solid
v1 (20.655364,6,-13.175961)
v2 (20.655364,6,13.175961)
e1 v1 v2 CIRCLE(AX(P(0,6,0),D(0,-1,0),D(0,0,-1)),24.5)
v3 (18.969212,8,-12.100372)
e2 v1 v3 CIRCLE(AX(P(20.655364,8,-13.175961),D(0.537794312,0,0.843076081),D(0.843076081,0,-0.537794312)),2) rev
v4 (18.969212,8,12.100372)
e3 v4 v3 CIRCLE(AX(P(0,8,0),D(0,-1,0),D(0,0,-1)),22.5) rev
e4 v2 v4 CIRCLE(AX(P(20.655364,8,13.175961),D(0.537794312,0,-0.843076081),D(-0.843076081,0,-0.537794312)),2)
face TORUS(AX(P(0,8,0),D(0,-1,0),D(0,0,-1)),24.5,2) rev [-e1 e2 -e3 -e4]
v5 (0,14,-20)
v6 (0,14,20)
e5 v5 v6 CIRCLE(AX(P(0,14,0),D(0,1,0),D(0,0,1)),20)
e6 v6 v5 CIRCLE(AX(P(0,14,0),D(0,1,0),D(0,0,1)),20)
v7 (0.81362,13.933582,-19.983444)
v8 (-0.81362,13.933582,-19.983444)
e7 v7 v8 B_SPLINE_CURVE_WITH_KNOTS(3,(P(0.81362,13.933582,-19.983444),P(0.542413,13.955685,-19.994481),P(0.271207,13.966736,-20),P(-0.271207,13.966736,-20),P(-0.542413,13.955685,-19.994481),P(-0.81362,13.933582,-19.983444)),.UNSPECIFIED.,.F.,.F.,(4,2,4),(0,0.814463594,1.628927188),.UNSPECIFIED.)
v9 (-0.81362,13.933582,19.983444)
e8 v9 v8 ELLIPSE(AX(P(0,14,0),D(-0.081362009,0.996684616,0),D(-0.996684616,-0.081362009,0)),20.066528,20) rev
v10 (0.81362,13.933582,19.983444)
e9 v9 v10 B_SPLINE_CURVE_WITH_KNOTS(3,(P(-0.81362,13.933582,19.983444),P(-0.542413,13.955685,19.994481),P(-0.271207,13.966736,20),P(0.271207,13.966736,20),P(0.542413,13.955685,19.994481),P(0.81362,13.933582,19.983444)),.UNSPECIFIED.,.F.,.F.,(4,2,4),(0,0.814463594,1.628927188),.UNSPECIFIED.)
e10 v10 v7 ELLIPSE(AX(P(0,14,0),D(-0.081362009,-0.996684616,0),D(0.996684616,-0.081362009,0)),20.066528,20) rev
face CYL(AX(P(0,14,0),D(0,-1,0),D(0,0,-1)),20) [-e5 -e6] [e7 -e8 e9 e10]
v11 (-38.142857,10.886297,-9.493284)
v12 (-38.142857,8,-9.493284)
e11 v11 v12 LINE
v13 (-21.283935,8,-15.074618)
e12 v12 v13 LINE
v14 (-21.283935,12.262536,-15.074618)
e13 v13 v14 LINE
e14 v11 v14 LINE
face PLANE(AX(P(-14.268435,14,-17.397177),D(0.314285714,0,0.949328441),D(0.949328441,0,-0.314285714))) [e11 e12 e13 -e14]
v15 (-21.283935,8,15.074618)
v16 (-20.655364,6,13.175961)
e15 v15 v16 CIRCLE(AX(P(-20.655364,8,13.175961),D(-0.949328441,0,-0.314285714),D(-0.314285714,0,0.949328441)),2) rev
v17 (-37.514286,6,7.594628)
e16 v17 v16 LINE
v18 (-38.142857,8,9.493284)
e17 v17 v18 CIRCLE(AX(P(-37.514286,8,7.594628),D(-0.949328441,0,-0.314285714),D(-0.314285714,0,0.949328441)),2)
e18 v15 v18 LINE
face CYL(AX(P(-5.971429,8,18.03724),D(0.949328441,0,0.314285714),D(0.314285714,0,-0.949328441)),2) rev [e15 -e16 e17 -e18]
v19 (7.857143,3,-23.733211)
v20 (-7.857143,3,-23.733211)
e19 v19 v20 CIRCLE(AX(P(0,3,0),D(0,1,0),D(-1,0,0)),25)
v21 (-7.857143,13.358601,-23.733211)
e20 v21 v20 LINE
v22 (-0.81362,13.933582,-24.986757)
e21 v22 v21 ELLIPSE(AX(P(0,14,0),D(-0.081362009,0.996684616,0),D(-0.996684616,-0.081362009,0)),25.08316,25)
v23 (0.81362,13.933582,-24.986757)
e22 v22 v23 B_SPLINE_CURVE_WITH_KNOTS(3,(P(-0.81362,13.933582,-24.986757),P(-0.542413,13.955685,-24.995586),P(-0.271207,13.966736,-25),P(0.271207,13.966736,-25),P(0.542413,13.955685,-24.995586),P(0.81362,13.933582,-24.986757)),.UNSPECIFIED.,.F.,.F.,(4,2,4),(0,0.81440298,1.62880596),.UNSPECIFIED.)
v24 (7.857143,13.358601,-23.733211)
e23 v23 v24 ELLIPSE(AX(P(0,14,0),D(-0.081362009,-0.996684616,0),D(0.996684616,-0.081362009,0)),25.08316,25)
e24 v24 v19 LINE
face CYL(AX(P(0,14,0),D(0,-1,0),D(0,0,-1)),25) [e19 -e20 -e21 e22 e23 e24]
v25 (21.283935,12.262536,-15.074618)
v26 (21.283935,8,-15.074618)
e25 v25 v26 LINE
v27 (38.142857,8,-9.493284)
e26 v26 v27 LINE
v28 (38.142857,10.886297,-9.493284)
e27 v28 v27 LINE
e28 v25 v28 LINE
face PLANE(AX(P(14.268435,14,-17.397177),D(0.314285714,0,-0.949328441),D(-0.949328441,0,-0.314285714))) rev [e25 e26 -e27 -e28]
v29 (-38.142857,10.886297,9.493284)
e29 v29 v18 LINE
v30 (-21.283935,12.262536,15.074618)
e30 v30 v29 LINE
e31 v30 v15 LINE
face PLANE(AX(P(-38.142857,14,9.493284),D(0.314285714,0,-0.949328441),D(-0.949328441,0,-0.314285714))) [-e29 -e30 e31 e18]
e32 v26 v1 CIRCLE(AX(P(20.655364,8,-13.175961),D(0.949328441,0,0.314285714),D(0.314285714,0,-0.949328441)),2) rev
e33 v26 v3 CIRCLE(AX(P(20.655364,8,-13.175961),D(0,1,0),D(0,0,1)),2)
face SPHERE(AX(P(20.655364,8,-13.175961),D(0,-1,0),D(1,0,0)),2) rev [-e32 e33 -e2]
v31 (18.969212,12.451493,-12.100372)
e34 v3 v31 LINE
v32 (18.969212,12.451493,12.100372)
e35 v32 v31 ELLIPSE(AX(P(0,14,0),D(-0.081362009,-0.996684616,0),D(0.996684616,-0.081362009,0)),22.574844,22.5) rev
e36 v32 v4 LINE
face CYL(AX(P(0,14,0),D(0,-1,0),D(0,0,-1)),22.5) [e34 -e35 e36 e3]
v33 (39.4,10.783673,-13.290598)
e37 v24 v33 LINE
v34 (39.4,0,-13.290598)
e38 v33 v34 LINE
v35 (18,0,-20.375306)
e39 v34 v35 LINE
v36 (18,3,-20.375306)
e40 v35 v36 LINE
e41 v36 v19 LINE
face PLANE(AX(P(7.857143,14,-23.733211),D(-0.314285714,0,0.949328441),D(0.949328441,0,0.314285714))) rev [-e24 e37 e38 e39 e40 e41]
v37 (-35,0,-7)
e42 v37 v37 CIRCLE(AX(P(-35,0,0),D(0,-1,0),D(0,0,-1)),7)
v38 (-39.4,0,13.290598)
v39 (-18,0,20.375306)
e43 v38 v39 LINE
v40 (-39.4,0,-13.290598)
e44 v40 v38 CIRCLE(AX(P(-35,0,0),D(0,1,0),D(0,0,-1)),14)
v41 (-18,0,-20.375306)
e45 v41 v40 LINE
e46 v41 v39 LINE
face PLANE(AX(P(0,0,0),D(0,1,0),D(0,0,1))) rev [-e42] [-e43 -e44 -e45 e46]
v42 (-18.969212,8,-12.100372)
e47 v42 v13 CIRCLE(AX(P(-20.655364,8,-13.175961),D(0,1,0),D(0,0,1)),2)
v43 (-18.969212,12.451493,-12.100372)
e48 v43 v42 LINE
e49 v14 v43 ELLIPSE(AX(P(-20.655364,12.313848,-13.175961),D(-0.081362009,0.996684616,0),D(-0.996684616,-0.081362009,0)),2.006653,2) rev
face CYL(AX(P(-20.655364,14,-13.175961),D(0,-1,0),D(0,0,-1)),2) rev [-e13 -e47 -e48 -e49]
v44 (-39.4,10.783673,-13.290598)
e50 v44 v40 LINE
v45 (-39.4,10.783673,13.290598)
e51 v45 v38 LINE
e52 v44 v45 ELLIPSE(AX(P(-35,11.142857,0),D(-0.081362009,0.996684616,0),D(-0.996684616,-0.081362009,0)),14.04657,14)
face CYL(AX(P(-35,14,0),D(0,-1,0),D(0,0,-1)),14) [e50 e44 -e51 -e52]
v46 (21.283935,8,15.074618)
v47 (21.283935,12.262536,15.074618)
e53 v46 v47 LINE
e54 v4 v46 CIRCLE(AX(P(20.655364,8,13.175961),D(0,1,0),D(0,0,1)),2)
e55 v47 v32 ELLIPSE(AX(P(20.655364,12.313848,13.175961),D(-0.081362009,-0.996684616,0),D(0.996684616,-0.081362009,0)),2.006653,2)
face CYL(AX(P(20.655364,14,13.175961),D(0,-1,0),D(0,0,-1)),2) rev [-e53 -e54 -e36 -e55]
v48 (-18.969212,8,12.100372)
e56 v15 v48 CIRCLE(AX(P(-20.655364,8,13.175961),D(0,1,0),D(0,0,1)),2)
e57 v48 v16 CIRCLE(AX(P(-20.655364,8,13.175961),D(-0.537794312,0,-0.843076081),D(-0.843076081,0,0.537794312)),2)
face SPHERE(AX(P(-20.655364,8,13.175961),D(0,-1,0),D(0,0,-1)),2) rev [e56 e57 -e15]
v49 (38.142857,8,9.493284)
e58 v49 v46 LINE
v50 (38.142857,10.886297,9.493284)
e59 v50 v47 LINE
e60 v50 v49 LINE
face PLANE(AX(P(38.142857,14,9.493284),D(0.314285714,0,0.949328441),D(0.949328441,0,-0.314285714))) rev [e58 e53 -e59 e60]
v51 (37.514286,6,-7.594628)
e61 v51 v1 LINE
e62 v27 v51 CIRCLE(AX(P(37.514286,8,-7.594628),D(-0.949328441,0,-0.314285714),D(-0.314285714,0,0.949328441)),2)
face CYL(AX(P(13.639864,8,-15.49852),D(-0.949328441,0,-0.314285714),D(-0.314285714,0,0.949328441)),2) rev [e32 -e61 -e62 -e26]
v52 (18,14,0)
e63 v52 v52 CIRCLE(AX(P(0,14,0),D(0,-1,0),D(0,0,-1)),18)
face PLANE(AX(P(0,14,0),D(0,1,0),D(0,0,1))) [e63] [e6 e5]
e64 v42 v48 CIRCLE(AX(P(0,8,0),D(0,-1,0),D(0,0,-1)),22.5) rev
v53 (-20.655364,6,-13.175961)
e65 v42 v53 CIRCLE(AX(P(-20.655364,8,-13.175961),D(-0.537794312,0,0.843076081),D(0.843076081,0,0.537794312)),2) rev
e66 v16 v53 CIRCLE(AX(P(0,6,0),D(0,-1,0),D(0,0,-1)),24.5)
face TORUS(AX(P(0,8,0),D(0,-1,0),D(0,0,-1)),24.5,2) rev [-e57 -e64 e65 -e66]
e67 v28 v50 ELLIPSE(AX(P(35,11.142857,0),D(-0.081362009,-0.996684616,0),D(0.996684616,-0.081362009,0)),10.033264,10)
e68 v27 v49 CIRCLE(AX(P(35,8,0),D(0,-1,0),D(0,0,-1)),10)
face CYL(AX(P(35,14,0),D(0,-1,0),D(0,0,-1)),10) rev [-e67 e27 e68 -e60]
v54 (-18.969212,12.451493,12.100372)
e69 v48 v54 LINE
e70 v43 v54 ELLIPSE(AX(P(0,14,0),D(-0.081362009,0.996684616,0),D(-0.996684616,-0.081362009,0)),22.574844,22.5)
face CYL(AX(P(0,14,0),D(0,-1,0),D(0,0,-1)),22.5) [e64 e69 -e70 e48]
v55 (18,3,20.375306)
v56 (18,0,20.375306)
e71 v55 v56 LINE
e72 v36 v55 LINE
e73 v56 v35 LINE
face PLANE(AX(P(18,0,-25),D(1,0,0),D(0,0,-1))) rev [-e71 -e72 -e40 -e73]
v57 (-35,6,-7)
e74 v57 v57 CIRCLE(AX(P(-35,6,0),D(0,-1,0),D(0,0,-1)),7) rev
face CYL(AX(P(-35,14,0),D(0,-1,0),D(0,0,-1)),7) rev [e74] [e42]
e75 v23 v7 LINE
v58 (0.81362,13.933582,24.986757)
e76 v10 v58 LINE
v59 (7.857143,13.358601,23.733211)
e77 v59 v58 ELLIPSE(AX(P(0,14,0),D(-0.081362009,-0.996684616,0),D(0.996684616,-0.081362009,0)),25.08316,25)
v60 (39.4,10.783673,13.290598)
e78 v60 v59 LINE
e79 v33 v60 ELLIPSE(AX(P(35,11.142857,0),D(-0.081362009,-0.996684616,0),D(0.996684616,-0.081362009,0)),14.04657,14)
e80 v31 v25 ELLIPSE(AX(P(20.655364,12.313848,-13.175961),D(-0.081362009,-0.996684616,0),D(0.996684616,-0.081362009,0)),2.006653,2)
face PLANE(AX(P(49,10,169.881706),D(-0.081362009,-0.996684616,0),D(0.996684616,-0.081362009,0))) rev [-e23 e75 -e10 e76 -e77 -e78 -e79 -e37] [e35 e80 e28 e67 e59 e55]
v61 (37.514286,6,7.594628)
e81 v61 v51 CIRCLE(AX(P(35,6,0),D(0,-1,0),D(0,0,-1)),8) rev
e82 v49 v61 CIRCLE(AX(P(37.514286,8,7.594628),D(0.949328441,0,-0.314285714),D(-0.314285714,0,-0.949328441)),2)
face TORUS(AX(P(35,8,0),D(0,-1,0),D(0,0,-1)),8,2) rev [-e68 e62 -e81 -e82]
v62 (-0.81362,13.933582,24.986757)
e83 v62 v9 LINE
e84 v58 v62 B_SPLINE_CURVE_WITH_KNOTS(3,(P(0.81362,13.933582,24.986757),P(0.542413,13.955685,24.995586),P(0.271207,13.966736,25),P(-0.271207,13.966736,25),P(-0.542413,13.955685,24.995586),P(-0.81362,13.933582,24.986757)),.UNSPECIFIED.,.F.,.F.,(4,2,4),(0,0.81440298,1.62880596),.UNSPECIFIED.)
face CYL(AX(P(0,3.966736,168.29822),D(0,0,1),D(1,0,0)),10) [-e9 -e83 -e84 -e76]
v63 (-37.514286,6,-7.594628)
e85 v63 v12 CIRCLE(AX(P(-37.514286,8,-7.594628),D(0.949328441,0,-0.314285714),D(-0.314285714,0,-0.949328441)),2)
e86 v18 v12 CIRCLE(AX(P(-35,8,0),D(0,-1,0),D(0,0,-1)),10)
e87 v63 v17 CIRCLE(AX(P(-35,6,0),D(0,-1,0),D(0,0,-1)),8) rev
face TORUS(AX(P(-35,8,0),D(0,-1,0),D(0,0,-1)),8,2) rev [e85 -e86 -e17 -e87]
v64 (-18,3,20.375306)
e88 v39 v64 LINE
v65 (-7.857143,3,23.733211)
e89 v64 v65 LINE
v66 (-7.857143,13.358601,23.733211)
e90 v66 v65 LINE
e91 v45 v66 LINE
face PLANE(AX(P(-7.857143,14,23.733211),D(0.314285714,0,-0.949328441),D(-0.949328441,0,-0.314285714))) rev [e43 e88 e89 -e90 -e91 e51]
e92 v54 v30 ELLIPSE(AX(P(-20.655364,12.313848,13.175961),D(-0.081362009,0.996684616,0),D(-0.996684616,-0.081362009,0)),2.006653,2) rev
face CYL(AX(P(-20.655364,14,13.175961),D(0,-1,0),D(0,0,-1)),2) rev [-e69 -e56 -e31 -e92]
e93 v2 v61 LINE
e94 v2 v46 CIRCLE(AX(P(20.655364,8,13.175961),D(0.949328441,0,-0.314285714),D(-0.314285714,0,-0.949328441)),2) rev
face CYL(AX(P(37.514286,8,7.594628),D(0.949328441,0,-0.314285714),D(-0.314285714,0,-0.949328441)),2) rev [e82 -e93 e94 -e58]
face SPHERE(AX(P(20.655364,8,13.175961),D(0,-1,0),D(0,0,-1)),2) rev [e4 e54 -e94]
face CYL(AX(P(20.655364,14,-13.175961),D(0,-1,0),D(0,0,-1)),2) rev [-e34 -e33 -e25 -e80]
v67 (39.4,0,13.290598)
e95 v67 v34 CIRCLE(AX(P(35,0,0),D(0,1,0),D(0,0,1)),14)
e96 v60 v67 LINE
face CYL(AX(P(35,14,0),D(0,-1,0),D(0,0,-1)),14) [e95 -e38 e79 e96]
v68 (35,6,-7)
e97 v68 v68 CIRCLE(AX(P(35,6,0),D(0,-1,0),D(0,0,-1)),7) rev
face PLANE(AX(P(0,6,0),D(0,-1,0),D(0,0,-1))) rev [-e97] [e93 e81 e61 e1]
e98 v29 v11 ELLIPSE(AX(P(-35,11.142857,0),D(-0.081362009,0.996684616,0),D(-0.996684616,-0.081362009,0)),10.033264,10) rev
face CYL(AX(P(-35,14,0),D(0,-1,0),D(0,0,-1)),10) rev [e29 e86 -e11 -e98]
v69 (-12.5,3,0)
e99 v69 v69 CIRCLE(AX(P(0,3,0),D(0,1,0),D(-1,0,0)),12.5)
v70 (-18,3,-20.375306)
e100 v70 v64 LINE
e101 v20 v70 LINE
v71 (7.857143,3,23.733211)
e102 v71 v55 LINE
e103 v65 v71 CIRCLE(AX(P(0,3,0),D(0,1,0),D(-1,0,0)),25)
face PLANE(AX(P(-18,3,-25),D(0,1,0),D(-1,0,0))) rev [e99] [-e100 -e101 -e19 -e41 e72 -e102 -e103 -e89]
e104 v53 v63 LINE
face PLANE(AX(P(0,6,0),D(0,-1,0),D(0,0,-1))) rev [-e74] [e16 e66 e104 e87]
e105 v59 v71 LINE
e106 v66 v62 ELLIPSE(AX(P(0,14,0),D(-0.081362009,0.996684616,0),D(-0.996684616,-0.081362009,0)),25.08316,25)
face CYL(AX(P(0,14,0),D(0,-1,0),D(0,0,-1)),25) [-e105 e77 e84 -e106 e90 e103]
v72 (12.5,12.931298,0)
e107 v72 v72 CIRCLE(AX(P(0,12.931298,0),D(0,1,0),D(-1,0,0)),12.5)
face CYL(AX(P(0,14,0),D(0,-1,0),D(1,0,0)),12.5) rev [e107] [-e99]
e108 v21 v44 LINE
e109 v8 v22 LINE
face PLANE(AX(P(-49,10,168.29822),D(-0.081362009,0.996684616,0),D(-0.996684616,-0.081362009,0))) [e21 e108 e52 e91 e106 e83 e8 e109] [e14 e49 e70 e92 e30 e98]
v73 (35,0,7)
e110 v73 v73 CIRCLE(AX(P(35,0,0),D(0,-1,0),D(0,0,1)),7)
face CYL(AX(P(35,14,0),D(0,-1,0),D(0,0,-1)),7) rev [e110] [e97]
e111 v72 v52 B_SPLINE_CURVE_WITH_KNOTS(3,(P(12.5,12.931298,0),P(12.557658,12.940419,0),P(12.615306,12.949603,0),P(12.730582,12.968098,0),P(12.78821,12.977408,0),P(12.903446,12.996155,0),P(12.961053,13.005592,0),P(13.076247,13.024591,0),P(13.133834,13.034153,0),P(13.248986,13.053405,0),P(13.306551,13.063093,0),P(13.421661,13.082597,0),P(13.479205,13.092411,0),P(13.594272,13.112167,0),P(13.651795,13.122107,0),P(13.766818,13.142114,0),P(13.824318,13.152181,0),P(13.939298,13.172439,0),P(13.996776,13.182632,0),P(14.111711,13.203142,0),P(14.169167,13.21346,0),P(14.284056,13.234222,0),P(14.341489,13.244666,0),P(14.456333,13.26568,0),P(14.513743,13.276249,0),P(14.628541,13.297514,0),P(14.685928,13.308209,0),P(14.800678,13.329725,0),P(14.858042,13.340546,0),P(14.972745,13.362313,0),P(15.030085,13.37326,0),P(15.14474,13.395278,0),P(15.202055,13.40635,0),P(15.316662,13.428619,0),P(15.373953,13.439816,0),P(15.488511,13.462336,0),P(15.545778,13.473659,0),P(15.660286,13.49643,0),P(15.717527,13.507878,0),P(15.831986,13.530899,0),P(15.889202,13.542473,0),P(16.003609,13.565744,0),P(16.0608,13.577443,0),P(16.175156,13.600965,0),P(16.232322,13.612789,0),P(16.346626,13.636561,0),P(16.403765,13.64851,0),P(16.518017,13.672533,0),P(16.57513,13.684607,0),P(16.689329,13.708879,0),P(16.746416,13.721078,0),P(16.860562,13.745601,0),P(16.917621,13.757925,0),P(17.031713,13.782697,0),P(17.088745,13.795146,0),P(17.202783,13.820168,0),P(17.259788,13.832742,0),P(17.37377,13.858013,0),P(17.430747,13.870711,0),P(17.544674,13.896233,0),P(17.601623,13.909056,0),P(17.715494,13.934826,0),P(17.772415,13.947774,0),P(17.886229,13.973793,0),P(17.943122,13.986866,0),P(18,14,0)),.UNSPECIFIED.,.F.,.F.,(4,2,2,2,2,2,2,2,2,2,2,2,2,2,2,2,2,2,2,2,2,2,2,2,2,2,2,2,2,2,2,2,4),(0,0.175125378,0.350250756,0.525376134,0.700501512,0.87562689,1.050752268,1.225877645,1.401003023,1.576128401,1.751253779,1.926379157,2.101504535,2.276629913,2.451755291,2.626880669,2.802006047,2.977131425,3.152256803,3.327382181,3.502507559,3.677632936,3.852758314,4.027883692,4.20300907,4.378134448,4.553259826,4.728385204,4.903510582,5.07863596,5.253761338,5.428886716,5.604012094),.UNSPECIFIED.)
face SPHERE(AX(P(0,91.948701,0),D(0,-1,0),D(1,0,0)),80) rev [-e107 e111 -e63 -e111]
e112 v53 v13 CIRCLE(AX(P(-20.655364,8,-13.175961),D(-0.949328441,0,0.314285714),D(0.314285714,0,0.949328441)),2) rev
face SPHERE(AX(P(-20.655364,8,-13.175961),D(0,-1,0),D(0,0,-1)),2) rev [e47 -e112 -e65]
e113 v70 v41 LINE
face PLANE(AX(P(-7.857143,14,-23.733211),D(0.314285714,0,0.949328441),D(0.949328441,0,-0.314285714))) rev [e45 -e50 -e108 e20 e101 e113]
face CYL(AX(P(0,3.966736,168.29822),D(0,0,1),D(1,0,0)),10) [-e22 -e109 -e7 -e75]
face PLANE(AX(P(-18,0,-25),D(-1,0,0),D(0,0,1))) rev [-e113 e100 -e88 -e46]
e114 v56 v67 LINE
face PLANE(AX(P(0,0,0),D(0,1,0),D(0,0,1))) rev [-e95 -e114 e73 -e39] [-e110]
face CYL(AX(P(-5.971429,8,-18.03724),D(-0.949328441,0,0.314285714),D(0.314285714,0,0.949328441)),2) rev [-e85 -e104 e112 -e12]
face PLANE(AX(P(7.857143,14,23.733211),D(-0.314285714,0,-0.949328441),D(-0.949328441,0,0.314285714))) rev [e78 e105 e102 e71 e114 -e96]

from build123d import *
from build123d.topology import SkipClean

# Parameters (mm, degrees)
EXTRUDE_1_DEPTH          = 14
CUT_EXTRUDE_1_DEPTH      = 57.762663785
SKETCH_4_R               = 7
CUT_EXTRUDE_2_DEPTH      = 57.762663785
CUT_EXTRUDE_START        = 6
CUT_EXTRUDE_3_DEPTH      = 51.762663785
SKETCH_7_R               = 20
EXTRUDE_2_DEPTH          = 14
CUT_EXTRUDE_4_DEPTH      = 57.762663785
CUT_EXTRUDE_4_DEPTH_BACK = 57.762663785
SKETCH_6_W               = 36
SKETCH_6_H               = 3
CUT_EXTRUDE_5_DEPTH      = 57.098128311
CUT_EXTRUDE_5_DEPTH_BACK = 57.098128311
SKETCH_9_R               = 12.5
FILLET_1_R               = 10
FILLET_4_R               = 2


with BuildPart() as part:
    # 草图2 → 凸台-拉伸1 (new body)
    with BuildSketch(Plane(origin=(0, 0, 0), x_dir=(1, 0, 0), z_dir=(0, 1, 0))):
        with BuildLine():
            Line((7.857142857, 23.733211037), (39.4, 13.290598181))
            ThreePointArc((39.4, 13.290598181), (49, 0), (39.4, -13.290598181))
            Line((39.4, -13.290598181), (7.857142857, -23.733211037))
            ThreePointArc((7.857142857, -23.733211037), (0, -25), (-7.857142857, -23.733211037))
            Line((-7.857142857, -23.733211037), (-39.4, -13.290598181))
            ThreePointArc((-39.4, -13.290598181), (-49, 0), (-39.4, 13.290598181))
            Line((-39.4, 13.290598181), (-7.857142857, 23.733211037))
            ThreePointArc((-7.857142857, 23.733211037), (0, 25), (7.857142857, 23.733211037))
        make_face()
    extrude(amount=EXTRUDE_1_DEPTH)

    # 草图3 → 切除-拉伸1 (cut, symmetric)
    with BuildSketch(Plane.XY):
        Polygon((-255.331422272, -6.84338141), (-49, 10), (0, 14), (206.331422272, 30.84338141), (172.644659452, 443.506225953), (-289.018185091, 405.819463133), align=None)
    cut_extrude_1 = extrude(amount=CUT_EXTRUDE_1_DEPTH, both=True, mode=Mode.SUBTRACT)

    # 镜向1: 切除-拉伸1 across plane
    add(cut_extrude_1.mirror(Plane(origin=(0, 0, 0), x_dir=(0, 0, 1), z_dir=(1, 0, 0))), mode=Mode.SUBTRACT)

    # 草图4 → 切除-拉伸2 (cut, through all)
    with BuildSketch(Plane.XZ):
        with Locations(Location((-35, 0, 0), (0, 0, 270))):
            Circle(SKETCH_4_R)
        with Locations((35, 0)):
            Circle(SKETCH_4_R)
    extrude(amount=-CUT_EXTRUDE_2_DEPTH, mode=Mode.SUBTRACT)

    # 草图5 → 切除-拉伸3 (cut, through all)
    with BuildSketch(Plane(origin=(0, 0, 0), x_dir=(1, 0, 0), z_dir=(0, 1, 0)).offset(CUT_EXTRUDE_START)):
        with BuildLine():
            Line((-38.142857143, -9.493284415), (-14.26843517, -17.397176719))
            ThreePointArc((-14.26843517, -17.397176719), (-22.5, 0), (-14.26843517, 17.397176719))
            Line((-14.26843517, 17.397176719), (-38.142857143, 9.493284415))
            ThreePointArc((-38.142857143, 9.493284415), (-45, 0), (-38.142857143, -9.493284415))
        make_face()
    cut_extrude_3 = extrude(amount=CUT_EXTRUDE_3_DEPTH, mode=Mode.SUBTRACT)

    # 镜向2: 切除-拉伸3 across plane
    add(cut_extrude_3.mirror(Plane(origin=(0, 0, 0), x_dir=(0, 0, 1), z_dir=(1, 0, 0))), mode=Mode.SUBTRACT)

    # 草图7 → 凸台-拉伸2 (add)
    with BuildSketch(Plane(origin=(0, 0, 0), x_dir=(1, 0, 0), z_dir=(0, 1, 0))):
        Circle(SKETCH_7_R)
    extrude(amount=EXTRUDE_2_DEPTH)

    # 草图6 → 切除-拉伸4 (cut, two sides: drawn at the far end of the back side and taken through both)
    with BuildSketch(Plane.XY.offset(-CUT_EXTRUDE_4_DEPTH_BACK)):
        with Locations((0, 1.5)):
            Rectangle(SKETCH_6_W, SKETCH_6_H)
    extrude(amount=CUT_EXTRUDE_4_DEPTH + CUT_EXTRUDE_4_DEPTH_BACK, mode=Mode.SUBTRACT)

    # 草图8 → 切除-旋转3 (revolve, cut)
    with SkipClean():  # the faces are left unmerged after this step: merging them gives an invalid solid
        with BuildSketch(Plane.XY):
            with BuildLine():
                ThreePointArc((0, 11.94870108), (9.058253519, 12.463180114), (18, 14))
                Line((18, 14), (0, 14))
                Line((0, 14), (0, 11.94870108))
            make_face()
            with BuildLine():
                Line((0, 11.94870108), (0, 14))
                Line((0, 14), (-18, 14))
                ThreePointArc((-18, 14), (-9.058253519, 12.463180114), (0, 11.94870108))
            make_face()
        revolve(axis=Axis((0, -0.298834831, 0), (0, 1, 0)), mode=Mode.SUBTRACT)
    add(part.part.scale(1), mode=Mode.REPLACE)  # the faces are merged on a copy

    # 草图9 → 切除-拉伸5 (cut, two sides: drawn at the far end of the back side and taken through both)
    with BuildSketch(Plane.XZ.offset(-3).offset(-CUT_EXTRUDE_5_DEPTH_BACK)):
        Circle(SKETCH_9_R)
    extrude(amount=CUT_EXTRUDE_5_DEPTH + CUT_EXTRUDE_5_DEPTH_BACK, mode=Mode.SUBTRACT)

    # 圆角1
    # the kernel refuses this fillet: 10 mm, written as the material it takes off along each edge
    with BuildSketch(Plane(origin=(0, 14, 17.959183673), x_dir=(0.9966846158226077, -0.08136200945491137, 0), z_dir=(0, 0, 1))) as fillet_1_piece_1_section:
        with BuildLine():
            CenterArc((FILLET_1_R * 0.0816326530612, -FILLET_1_R), FILLET_1_R, 90, 9.333716743)
            Line((-FILLET_1_R * 0.080551873211, -FILLET_1_R * 0.0132395531651), (0, 0))
            Line((0, 0), (FILLET_1_R * 0.0816326530612, 0))
        make_face()
    fillet_1_piece_1 = extrude(amount=9.081632653, mode=Mode.PRIVATE)
    fillet_1_piece_1 = fillet_1_piece_1 - Plane(origin=(0, 13.973401813, 0), x_dir=(1, 0, 0), z_dir=(0, -1, 0)) * Cylinder(20, 22, mode=Mode.PRIVATE)
    add(fillet_1_piece_1, mode=Mode.SUBTRACT)
    with BuildSketch(Plane(origin=(0, 14, -27.040816327), x_dir=(0.9966846158226077, -0.08136200945491137, 0), z_dir=(0, 0, 1))) as fillet_1_piece_2_section:
        with BuildLine():
            CenterArc((FILLET_1_R * 0.0816326530612, -FILLET_1_R), FILLET_1_R, 90, 9.333716743)
            Line((-FILLET_1_R * 0.080551873211, -FILLET_1_R * 0.0132395531651), (0, 0))
            Line((0, 0), (FILLET_1_R * 0.0816326530612, 0))
        make_face()
    fillet_1_piece_2 = extrude(amount=9.081632653, mode=Mode.PRIVATE)
    fillet_1_piece_2 = fillet_1_piece_2 - Plane(origin=(0, 13.973401813, 0), x_dir=(1, 0, 0), z_dir=(0, -1, 0)) * Cylinder(20, 22, mode=Mode.PRIVATE)
    add(fillet_1_piece_2, mode=Mode.SUBTRACT)

    # 圆角4
    fillet_4_edges = [part.edges().sort_by_distance(p)[0] for p in [
        (26.205646157, 6, 13.445230567),
        (45, 6, 0),
        (-26.205646157, 6, 13.445230567),
        (-45, 6, 0),
        (-14.26843517, 9.417614891, 17.397176719),
        (14.26843517, 9.417614891, 17.397176719),
        (26.205646157, 6, -13.445230567),
        (14.26843517, 9.417614891, -17.397176719),
        (22.5, 6, 0),
        (-14.26843517, 9.417614891, -17.397176719),
        (-22.5, 6, 0),
        (-26.205646157, 6, -13.445230567),
    ]]
    fillet(fillet_4_edges, radius=FILLET_4_R)


solid = part.part
